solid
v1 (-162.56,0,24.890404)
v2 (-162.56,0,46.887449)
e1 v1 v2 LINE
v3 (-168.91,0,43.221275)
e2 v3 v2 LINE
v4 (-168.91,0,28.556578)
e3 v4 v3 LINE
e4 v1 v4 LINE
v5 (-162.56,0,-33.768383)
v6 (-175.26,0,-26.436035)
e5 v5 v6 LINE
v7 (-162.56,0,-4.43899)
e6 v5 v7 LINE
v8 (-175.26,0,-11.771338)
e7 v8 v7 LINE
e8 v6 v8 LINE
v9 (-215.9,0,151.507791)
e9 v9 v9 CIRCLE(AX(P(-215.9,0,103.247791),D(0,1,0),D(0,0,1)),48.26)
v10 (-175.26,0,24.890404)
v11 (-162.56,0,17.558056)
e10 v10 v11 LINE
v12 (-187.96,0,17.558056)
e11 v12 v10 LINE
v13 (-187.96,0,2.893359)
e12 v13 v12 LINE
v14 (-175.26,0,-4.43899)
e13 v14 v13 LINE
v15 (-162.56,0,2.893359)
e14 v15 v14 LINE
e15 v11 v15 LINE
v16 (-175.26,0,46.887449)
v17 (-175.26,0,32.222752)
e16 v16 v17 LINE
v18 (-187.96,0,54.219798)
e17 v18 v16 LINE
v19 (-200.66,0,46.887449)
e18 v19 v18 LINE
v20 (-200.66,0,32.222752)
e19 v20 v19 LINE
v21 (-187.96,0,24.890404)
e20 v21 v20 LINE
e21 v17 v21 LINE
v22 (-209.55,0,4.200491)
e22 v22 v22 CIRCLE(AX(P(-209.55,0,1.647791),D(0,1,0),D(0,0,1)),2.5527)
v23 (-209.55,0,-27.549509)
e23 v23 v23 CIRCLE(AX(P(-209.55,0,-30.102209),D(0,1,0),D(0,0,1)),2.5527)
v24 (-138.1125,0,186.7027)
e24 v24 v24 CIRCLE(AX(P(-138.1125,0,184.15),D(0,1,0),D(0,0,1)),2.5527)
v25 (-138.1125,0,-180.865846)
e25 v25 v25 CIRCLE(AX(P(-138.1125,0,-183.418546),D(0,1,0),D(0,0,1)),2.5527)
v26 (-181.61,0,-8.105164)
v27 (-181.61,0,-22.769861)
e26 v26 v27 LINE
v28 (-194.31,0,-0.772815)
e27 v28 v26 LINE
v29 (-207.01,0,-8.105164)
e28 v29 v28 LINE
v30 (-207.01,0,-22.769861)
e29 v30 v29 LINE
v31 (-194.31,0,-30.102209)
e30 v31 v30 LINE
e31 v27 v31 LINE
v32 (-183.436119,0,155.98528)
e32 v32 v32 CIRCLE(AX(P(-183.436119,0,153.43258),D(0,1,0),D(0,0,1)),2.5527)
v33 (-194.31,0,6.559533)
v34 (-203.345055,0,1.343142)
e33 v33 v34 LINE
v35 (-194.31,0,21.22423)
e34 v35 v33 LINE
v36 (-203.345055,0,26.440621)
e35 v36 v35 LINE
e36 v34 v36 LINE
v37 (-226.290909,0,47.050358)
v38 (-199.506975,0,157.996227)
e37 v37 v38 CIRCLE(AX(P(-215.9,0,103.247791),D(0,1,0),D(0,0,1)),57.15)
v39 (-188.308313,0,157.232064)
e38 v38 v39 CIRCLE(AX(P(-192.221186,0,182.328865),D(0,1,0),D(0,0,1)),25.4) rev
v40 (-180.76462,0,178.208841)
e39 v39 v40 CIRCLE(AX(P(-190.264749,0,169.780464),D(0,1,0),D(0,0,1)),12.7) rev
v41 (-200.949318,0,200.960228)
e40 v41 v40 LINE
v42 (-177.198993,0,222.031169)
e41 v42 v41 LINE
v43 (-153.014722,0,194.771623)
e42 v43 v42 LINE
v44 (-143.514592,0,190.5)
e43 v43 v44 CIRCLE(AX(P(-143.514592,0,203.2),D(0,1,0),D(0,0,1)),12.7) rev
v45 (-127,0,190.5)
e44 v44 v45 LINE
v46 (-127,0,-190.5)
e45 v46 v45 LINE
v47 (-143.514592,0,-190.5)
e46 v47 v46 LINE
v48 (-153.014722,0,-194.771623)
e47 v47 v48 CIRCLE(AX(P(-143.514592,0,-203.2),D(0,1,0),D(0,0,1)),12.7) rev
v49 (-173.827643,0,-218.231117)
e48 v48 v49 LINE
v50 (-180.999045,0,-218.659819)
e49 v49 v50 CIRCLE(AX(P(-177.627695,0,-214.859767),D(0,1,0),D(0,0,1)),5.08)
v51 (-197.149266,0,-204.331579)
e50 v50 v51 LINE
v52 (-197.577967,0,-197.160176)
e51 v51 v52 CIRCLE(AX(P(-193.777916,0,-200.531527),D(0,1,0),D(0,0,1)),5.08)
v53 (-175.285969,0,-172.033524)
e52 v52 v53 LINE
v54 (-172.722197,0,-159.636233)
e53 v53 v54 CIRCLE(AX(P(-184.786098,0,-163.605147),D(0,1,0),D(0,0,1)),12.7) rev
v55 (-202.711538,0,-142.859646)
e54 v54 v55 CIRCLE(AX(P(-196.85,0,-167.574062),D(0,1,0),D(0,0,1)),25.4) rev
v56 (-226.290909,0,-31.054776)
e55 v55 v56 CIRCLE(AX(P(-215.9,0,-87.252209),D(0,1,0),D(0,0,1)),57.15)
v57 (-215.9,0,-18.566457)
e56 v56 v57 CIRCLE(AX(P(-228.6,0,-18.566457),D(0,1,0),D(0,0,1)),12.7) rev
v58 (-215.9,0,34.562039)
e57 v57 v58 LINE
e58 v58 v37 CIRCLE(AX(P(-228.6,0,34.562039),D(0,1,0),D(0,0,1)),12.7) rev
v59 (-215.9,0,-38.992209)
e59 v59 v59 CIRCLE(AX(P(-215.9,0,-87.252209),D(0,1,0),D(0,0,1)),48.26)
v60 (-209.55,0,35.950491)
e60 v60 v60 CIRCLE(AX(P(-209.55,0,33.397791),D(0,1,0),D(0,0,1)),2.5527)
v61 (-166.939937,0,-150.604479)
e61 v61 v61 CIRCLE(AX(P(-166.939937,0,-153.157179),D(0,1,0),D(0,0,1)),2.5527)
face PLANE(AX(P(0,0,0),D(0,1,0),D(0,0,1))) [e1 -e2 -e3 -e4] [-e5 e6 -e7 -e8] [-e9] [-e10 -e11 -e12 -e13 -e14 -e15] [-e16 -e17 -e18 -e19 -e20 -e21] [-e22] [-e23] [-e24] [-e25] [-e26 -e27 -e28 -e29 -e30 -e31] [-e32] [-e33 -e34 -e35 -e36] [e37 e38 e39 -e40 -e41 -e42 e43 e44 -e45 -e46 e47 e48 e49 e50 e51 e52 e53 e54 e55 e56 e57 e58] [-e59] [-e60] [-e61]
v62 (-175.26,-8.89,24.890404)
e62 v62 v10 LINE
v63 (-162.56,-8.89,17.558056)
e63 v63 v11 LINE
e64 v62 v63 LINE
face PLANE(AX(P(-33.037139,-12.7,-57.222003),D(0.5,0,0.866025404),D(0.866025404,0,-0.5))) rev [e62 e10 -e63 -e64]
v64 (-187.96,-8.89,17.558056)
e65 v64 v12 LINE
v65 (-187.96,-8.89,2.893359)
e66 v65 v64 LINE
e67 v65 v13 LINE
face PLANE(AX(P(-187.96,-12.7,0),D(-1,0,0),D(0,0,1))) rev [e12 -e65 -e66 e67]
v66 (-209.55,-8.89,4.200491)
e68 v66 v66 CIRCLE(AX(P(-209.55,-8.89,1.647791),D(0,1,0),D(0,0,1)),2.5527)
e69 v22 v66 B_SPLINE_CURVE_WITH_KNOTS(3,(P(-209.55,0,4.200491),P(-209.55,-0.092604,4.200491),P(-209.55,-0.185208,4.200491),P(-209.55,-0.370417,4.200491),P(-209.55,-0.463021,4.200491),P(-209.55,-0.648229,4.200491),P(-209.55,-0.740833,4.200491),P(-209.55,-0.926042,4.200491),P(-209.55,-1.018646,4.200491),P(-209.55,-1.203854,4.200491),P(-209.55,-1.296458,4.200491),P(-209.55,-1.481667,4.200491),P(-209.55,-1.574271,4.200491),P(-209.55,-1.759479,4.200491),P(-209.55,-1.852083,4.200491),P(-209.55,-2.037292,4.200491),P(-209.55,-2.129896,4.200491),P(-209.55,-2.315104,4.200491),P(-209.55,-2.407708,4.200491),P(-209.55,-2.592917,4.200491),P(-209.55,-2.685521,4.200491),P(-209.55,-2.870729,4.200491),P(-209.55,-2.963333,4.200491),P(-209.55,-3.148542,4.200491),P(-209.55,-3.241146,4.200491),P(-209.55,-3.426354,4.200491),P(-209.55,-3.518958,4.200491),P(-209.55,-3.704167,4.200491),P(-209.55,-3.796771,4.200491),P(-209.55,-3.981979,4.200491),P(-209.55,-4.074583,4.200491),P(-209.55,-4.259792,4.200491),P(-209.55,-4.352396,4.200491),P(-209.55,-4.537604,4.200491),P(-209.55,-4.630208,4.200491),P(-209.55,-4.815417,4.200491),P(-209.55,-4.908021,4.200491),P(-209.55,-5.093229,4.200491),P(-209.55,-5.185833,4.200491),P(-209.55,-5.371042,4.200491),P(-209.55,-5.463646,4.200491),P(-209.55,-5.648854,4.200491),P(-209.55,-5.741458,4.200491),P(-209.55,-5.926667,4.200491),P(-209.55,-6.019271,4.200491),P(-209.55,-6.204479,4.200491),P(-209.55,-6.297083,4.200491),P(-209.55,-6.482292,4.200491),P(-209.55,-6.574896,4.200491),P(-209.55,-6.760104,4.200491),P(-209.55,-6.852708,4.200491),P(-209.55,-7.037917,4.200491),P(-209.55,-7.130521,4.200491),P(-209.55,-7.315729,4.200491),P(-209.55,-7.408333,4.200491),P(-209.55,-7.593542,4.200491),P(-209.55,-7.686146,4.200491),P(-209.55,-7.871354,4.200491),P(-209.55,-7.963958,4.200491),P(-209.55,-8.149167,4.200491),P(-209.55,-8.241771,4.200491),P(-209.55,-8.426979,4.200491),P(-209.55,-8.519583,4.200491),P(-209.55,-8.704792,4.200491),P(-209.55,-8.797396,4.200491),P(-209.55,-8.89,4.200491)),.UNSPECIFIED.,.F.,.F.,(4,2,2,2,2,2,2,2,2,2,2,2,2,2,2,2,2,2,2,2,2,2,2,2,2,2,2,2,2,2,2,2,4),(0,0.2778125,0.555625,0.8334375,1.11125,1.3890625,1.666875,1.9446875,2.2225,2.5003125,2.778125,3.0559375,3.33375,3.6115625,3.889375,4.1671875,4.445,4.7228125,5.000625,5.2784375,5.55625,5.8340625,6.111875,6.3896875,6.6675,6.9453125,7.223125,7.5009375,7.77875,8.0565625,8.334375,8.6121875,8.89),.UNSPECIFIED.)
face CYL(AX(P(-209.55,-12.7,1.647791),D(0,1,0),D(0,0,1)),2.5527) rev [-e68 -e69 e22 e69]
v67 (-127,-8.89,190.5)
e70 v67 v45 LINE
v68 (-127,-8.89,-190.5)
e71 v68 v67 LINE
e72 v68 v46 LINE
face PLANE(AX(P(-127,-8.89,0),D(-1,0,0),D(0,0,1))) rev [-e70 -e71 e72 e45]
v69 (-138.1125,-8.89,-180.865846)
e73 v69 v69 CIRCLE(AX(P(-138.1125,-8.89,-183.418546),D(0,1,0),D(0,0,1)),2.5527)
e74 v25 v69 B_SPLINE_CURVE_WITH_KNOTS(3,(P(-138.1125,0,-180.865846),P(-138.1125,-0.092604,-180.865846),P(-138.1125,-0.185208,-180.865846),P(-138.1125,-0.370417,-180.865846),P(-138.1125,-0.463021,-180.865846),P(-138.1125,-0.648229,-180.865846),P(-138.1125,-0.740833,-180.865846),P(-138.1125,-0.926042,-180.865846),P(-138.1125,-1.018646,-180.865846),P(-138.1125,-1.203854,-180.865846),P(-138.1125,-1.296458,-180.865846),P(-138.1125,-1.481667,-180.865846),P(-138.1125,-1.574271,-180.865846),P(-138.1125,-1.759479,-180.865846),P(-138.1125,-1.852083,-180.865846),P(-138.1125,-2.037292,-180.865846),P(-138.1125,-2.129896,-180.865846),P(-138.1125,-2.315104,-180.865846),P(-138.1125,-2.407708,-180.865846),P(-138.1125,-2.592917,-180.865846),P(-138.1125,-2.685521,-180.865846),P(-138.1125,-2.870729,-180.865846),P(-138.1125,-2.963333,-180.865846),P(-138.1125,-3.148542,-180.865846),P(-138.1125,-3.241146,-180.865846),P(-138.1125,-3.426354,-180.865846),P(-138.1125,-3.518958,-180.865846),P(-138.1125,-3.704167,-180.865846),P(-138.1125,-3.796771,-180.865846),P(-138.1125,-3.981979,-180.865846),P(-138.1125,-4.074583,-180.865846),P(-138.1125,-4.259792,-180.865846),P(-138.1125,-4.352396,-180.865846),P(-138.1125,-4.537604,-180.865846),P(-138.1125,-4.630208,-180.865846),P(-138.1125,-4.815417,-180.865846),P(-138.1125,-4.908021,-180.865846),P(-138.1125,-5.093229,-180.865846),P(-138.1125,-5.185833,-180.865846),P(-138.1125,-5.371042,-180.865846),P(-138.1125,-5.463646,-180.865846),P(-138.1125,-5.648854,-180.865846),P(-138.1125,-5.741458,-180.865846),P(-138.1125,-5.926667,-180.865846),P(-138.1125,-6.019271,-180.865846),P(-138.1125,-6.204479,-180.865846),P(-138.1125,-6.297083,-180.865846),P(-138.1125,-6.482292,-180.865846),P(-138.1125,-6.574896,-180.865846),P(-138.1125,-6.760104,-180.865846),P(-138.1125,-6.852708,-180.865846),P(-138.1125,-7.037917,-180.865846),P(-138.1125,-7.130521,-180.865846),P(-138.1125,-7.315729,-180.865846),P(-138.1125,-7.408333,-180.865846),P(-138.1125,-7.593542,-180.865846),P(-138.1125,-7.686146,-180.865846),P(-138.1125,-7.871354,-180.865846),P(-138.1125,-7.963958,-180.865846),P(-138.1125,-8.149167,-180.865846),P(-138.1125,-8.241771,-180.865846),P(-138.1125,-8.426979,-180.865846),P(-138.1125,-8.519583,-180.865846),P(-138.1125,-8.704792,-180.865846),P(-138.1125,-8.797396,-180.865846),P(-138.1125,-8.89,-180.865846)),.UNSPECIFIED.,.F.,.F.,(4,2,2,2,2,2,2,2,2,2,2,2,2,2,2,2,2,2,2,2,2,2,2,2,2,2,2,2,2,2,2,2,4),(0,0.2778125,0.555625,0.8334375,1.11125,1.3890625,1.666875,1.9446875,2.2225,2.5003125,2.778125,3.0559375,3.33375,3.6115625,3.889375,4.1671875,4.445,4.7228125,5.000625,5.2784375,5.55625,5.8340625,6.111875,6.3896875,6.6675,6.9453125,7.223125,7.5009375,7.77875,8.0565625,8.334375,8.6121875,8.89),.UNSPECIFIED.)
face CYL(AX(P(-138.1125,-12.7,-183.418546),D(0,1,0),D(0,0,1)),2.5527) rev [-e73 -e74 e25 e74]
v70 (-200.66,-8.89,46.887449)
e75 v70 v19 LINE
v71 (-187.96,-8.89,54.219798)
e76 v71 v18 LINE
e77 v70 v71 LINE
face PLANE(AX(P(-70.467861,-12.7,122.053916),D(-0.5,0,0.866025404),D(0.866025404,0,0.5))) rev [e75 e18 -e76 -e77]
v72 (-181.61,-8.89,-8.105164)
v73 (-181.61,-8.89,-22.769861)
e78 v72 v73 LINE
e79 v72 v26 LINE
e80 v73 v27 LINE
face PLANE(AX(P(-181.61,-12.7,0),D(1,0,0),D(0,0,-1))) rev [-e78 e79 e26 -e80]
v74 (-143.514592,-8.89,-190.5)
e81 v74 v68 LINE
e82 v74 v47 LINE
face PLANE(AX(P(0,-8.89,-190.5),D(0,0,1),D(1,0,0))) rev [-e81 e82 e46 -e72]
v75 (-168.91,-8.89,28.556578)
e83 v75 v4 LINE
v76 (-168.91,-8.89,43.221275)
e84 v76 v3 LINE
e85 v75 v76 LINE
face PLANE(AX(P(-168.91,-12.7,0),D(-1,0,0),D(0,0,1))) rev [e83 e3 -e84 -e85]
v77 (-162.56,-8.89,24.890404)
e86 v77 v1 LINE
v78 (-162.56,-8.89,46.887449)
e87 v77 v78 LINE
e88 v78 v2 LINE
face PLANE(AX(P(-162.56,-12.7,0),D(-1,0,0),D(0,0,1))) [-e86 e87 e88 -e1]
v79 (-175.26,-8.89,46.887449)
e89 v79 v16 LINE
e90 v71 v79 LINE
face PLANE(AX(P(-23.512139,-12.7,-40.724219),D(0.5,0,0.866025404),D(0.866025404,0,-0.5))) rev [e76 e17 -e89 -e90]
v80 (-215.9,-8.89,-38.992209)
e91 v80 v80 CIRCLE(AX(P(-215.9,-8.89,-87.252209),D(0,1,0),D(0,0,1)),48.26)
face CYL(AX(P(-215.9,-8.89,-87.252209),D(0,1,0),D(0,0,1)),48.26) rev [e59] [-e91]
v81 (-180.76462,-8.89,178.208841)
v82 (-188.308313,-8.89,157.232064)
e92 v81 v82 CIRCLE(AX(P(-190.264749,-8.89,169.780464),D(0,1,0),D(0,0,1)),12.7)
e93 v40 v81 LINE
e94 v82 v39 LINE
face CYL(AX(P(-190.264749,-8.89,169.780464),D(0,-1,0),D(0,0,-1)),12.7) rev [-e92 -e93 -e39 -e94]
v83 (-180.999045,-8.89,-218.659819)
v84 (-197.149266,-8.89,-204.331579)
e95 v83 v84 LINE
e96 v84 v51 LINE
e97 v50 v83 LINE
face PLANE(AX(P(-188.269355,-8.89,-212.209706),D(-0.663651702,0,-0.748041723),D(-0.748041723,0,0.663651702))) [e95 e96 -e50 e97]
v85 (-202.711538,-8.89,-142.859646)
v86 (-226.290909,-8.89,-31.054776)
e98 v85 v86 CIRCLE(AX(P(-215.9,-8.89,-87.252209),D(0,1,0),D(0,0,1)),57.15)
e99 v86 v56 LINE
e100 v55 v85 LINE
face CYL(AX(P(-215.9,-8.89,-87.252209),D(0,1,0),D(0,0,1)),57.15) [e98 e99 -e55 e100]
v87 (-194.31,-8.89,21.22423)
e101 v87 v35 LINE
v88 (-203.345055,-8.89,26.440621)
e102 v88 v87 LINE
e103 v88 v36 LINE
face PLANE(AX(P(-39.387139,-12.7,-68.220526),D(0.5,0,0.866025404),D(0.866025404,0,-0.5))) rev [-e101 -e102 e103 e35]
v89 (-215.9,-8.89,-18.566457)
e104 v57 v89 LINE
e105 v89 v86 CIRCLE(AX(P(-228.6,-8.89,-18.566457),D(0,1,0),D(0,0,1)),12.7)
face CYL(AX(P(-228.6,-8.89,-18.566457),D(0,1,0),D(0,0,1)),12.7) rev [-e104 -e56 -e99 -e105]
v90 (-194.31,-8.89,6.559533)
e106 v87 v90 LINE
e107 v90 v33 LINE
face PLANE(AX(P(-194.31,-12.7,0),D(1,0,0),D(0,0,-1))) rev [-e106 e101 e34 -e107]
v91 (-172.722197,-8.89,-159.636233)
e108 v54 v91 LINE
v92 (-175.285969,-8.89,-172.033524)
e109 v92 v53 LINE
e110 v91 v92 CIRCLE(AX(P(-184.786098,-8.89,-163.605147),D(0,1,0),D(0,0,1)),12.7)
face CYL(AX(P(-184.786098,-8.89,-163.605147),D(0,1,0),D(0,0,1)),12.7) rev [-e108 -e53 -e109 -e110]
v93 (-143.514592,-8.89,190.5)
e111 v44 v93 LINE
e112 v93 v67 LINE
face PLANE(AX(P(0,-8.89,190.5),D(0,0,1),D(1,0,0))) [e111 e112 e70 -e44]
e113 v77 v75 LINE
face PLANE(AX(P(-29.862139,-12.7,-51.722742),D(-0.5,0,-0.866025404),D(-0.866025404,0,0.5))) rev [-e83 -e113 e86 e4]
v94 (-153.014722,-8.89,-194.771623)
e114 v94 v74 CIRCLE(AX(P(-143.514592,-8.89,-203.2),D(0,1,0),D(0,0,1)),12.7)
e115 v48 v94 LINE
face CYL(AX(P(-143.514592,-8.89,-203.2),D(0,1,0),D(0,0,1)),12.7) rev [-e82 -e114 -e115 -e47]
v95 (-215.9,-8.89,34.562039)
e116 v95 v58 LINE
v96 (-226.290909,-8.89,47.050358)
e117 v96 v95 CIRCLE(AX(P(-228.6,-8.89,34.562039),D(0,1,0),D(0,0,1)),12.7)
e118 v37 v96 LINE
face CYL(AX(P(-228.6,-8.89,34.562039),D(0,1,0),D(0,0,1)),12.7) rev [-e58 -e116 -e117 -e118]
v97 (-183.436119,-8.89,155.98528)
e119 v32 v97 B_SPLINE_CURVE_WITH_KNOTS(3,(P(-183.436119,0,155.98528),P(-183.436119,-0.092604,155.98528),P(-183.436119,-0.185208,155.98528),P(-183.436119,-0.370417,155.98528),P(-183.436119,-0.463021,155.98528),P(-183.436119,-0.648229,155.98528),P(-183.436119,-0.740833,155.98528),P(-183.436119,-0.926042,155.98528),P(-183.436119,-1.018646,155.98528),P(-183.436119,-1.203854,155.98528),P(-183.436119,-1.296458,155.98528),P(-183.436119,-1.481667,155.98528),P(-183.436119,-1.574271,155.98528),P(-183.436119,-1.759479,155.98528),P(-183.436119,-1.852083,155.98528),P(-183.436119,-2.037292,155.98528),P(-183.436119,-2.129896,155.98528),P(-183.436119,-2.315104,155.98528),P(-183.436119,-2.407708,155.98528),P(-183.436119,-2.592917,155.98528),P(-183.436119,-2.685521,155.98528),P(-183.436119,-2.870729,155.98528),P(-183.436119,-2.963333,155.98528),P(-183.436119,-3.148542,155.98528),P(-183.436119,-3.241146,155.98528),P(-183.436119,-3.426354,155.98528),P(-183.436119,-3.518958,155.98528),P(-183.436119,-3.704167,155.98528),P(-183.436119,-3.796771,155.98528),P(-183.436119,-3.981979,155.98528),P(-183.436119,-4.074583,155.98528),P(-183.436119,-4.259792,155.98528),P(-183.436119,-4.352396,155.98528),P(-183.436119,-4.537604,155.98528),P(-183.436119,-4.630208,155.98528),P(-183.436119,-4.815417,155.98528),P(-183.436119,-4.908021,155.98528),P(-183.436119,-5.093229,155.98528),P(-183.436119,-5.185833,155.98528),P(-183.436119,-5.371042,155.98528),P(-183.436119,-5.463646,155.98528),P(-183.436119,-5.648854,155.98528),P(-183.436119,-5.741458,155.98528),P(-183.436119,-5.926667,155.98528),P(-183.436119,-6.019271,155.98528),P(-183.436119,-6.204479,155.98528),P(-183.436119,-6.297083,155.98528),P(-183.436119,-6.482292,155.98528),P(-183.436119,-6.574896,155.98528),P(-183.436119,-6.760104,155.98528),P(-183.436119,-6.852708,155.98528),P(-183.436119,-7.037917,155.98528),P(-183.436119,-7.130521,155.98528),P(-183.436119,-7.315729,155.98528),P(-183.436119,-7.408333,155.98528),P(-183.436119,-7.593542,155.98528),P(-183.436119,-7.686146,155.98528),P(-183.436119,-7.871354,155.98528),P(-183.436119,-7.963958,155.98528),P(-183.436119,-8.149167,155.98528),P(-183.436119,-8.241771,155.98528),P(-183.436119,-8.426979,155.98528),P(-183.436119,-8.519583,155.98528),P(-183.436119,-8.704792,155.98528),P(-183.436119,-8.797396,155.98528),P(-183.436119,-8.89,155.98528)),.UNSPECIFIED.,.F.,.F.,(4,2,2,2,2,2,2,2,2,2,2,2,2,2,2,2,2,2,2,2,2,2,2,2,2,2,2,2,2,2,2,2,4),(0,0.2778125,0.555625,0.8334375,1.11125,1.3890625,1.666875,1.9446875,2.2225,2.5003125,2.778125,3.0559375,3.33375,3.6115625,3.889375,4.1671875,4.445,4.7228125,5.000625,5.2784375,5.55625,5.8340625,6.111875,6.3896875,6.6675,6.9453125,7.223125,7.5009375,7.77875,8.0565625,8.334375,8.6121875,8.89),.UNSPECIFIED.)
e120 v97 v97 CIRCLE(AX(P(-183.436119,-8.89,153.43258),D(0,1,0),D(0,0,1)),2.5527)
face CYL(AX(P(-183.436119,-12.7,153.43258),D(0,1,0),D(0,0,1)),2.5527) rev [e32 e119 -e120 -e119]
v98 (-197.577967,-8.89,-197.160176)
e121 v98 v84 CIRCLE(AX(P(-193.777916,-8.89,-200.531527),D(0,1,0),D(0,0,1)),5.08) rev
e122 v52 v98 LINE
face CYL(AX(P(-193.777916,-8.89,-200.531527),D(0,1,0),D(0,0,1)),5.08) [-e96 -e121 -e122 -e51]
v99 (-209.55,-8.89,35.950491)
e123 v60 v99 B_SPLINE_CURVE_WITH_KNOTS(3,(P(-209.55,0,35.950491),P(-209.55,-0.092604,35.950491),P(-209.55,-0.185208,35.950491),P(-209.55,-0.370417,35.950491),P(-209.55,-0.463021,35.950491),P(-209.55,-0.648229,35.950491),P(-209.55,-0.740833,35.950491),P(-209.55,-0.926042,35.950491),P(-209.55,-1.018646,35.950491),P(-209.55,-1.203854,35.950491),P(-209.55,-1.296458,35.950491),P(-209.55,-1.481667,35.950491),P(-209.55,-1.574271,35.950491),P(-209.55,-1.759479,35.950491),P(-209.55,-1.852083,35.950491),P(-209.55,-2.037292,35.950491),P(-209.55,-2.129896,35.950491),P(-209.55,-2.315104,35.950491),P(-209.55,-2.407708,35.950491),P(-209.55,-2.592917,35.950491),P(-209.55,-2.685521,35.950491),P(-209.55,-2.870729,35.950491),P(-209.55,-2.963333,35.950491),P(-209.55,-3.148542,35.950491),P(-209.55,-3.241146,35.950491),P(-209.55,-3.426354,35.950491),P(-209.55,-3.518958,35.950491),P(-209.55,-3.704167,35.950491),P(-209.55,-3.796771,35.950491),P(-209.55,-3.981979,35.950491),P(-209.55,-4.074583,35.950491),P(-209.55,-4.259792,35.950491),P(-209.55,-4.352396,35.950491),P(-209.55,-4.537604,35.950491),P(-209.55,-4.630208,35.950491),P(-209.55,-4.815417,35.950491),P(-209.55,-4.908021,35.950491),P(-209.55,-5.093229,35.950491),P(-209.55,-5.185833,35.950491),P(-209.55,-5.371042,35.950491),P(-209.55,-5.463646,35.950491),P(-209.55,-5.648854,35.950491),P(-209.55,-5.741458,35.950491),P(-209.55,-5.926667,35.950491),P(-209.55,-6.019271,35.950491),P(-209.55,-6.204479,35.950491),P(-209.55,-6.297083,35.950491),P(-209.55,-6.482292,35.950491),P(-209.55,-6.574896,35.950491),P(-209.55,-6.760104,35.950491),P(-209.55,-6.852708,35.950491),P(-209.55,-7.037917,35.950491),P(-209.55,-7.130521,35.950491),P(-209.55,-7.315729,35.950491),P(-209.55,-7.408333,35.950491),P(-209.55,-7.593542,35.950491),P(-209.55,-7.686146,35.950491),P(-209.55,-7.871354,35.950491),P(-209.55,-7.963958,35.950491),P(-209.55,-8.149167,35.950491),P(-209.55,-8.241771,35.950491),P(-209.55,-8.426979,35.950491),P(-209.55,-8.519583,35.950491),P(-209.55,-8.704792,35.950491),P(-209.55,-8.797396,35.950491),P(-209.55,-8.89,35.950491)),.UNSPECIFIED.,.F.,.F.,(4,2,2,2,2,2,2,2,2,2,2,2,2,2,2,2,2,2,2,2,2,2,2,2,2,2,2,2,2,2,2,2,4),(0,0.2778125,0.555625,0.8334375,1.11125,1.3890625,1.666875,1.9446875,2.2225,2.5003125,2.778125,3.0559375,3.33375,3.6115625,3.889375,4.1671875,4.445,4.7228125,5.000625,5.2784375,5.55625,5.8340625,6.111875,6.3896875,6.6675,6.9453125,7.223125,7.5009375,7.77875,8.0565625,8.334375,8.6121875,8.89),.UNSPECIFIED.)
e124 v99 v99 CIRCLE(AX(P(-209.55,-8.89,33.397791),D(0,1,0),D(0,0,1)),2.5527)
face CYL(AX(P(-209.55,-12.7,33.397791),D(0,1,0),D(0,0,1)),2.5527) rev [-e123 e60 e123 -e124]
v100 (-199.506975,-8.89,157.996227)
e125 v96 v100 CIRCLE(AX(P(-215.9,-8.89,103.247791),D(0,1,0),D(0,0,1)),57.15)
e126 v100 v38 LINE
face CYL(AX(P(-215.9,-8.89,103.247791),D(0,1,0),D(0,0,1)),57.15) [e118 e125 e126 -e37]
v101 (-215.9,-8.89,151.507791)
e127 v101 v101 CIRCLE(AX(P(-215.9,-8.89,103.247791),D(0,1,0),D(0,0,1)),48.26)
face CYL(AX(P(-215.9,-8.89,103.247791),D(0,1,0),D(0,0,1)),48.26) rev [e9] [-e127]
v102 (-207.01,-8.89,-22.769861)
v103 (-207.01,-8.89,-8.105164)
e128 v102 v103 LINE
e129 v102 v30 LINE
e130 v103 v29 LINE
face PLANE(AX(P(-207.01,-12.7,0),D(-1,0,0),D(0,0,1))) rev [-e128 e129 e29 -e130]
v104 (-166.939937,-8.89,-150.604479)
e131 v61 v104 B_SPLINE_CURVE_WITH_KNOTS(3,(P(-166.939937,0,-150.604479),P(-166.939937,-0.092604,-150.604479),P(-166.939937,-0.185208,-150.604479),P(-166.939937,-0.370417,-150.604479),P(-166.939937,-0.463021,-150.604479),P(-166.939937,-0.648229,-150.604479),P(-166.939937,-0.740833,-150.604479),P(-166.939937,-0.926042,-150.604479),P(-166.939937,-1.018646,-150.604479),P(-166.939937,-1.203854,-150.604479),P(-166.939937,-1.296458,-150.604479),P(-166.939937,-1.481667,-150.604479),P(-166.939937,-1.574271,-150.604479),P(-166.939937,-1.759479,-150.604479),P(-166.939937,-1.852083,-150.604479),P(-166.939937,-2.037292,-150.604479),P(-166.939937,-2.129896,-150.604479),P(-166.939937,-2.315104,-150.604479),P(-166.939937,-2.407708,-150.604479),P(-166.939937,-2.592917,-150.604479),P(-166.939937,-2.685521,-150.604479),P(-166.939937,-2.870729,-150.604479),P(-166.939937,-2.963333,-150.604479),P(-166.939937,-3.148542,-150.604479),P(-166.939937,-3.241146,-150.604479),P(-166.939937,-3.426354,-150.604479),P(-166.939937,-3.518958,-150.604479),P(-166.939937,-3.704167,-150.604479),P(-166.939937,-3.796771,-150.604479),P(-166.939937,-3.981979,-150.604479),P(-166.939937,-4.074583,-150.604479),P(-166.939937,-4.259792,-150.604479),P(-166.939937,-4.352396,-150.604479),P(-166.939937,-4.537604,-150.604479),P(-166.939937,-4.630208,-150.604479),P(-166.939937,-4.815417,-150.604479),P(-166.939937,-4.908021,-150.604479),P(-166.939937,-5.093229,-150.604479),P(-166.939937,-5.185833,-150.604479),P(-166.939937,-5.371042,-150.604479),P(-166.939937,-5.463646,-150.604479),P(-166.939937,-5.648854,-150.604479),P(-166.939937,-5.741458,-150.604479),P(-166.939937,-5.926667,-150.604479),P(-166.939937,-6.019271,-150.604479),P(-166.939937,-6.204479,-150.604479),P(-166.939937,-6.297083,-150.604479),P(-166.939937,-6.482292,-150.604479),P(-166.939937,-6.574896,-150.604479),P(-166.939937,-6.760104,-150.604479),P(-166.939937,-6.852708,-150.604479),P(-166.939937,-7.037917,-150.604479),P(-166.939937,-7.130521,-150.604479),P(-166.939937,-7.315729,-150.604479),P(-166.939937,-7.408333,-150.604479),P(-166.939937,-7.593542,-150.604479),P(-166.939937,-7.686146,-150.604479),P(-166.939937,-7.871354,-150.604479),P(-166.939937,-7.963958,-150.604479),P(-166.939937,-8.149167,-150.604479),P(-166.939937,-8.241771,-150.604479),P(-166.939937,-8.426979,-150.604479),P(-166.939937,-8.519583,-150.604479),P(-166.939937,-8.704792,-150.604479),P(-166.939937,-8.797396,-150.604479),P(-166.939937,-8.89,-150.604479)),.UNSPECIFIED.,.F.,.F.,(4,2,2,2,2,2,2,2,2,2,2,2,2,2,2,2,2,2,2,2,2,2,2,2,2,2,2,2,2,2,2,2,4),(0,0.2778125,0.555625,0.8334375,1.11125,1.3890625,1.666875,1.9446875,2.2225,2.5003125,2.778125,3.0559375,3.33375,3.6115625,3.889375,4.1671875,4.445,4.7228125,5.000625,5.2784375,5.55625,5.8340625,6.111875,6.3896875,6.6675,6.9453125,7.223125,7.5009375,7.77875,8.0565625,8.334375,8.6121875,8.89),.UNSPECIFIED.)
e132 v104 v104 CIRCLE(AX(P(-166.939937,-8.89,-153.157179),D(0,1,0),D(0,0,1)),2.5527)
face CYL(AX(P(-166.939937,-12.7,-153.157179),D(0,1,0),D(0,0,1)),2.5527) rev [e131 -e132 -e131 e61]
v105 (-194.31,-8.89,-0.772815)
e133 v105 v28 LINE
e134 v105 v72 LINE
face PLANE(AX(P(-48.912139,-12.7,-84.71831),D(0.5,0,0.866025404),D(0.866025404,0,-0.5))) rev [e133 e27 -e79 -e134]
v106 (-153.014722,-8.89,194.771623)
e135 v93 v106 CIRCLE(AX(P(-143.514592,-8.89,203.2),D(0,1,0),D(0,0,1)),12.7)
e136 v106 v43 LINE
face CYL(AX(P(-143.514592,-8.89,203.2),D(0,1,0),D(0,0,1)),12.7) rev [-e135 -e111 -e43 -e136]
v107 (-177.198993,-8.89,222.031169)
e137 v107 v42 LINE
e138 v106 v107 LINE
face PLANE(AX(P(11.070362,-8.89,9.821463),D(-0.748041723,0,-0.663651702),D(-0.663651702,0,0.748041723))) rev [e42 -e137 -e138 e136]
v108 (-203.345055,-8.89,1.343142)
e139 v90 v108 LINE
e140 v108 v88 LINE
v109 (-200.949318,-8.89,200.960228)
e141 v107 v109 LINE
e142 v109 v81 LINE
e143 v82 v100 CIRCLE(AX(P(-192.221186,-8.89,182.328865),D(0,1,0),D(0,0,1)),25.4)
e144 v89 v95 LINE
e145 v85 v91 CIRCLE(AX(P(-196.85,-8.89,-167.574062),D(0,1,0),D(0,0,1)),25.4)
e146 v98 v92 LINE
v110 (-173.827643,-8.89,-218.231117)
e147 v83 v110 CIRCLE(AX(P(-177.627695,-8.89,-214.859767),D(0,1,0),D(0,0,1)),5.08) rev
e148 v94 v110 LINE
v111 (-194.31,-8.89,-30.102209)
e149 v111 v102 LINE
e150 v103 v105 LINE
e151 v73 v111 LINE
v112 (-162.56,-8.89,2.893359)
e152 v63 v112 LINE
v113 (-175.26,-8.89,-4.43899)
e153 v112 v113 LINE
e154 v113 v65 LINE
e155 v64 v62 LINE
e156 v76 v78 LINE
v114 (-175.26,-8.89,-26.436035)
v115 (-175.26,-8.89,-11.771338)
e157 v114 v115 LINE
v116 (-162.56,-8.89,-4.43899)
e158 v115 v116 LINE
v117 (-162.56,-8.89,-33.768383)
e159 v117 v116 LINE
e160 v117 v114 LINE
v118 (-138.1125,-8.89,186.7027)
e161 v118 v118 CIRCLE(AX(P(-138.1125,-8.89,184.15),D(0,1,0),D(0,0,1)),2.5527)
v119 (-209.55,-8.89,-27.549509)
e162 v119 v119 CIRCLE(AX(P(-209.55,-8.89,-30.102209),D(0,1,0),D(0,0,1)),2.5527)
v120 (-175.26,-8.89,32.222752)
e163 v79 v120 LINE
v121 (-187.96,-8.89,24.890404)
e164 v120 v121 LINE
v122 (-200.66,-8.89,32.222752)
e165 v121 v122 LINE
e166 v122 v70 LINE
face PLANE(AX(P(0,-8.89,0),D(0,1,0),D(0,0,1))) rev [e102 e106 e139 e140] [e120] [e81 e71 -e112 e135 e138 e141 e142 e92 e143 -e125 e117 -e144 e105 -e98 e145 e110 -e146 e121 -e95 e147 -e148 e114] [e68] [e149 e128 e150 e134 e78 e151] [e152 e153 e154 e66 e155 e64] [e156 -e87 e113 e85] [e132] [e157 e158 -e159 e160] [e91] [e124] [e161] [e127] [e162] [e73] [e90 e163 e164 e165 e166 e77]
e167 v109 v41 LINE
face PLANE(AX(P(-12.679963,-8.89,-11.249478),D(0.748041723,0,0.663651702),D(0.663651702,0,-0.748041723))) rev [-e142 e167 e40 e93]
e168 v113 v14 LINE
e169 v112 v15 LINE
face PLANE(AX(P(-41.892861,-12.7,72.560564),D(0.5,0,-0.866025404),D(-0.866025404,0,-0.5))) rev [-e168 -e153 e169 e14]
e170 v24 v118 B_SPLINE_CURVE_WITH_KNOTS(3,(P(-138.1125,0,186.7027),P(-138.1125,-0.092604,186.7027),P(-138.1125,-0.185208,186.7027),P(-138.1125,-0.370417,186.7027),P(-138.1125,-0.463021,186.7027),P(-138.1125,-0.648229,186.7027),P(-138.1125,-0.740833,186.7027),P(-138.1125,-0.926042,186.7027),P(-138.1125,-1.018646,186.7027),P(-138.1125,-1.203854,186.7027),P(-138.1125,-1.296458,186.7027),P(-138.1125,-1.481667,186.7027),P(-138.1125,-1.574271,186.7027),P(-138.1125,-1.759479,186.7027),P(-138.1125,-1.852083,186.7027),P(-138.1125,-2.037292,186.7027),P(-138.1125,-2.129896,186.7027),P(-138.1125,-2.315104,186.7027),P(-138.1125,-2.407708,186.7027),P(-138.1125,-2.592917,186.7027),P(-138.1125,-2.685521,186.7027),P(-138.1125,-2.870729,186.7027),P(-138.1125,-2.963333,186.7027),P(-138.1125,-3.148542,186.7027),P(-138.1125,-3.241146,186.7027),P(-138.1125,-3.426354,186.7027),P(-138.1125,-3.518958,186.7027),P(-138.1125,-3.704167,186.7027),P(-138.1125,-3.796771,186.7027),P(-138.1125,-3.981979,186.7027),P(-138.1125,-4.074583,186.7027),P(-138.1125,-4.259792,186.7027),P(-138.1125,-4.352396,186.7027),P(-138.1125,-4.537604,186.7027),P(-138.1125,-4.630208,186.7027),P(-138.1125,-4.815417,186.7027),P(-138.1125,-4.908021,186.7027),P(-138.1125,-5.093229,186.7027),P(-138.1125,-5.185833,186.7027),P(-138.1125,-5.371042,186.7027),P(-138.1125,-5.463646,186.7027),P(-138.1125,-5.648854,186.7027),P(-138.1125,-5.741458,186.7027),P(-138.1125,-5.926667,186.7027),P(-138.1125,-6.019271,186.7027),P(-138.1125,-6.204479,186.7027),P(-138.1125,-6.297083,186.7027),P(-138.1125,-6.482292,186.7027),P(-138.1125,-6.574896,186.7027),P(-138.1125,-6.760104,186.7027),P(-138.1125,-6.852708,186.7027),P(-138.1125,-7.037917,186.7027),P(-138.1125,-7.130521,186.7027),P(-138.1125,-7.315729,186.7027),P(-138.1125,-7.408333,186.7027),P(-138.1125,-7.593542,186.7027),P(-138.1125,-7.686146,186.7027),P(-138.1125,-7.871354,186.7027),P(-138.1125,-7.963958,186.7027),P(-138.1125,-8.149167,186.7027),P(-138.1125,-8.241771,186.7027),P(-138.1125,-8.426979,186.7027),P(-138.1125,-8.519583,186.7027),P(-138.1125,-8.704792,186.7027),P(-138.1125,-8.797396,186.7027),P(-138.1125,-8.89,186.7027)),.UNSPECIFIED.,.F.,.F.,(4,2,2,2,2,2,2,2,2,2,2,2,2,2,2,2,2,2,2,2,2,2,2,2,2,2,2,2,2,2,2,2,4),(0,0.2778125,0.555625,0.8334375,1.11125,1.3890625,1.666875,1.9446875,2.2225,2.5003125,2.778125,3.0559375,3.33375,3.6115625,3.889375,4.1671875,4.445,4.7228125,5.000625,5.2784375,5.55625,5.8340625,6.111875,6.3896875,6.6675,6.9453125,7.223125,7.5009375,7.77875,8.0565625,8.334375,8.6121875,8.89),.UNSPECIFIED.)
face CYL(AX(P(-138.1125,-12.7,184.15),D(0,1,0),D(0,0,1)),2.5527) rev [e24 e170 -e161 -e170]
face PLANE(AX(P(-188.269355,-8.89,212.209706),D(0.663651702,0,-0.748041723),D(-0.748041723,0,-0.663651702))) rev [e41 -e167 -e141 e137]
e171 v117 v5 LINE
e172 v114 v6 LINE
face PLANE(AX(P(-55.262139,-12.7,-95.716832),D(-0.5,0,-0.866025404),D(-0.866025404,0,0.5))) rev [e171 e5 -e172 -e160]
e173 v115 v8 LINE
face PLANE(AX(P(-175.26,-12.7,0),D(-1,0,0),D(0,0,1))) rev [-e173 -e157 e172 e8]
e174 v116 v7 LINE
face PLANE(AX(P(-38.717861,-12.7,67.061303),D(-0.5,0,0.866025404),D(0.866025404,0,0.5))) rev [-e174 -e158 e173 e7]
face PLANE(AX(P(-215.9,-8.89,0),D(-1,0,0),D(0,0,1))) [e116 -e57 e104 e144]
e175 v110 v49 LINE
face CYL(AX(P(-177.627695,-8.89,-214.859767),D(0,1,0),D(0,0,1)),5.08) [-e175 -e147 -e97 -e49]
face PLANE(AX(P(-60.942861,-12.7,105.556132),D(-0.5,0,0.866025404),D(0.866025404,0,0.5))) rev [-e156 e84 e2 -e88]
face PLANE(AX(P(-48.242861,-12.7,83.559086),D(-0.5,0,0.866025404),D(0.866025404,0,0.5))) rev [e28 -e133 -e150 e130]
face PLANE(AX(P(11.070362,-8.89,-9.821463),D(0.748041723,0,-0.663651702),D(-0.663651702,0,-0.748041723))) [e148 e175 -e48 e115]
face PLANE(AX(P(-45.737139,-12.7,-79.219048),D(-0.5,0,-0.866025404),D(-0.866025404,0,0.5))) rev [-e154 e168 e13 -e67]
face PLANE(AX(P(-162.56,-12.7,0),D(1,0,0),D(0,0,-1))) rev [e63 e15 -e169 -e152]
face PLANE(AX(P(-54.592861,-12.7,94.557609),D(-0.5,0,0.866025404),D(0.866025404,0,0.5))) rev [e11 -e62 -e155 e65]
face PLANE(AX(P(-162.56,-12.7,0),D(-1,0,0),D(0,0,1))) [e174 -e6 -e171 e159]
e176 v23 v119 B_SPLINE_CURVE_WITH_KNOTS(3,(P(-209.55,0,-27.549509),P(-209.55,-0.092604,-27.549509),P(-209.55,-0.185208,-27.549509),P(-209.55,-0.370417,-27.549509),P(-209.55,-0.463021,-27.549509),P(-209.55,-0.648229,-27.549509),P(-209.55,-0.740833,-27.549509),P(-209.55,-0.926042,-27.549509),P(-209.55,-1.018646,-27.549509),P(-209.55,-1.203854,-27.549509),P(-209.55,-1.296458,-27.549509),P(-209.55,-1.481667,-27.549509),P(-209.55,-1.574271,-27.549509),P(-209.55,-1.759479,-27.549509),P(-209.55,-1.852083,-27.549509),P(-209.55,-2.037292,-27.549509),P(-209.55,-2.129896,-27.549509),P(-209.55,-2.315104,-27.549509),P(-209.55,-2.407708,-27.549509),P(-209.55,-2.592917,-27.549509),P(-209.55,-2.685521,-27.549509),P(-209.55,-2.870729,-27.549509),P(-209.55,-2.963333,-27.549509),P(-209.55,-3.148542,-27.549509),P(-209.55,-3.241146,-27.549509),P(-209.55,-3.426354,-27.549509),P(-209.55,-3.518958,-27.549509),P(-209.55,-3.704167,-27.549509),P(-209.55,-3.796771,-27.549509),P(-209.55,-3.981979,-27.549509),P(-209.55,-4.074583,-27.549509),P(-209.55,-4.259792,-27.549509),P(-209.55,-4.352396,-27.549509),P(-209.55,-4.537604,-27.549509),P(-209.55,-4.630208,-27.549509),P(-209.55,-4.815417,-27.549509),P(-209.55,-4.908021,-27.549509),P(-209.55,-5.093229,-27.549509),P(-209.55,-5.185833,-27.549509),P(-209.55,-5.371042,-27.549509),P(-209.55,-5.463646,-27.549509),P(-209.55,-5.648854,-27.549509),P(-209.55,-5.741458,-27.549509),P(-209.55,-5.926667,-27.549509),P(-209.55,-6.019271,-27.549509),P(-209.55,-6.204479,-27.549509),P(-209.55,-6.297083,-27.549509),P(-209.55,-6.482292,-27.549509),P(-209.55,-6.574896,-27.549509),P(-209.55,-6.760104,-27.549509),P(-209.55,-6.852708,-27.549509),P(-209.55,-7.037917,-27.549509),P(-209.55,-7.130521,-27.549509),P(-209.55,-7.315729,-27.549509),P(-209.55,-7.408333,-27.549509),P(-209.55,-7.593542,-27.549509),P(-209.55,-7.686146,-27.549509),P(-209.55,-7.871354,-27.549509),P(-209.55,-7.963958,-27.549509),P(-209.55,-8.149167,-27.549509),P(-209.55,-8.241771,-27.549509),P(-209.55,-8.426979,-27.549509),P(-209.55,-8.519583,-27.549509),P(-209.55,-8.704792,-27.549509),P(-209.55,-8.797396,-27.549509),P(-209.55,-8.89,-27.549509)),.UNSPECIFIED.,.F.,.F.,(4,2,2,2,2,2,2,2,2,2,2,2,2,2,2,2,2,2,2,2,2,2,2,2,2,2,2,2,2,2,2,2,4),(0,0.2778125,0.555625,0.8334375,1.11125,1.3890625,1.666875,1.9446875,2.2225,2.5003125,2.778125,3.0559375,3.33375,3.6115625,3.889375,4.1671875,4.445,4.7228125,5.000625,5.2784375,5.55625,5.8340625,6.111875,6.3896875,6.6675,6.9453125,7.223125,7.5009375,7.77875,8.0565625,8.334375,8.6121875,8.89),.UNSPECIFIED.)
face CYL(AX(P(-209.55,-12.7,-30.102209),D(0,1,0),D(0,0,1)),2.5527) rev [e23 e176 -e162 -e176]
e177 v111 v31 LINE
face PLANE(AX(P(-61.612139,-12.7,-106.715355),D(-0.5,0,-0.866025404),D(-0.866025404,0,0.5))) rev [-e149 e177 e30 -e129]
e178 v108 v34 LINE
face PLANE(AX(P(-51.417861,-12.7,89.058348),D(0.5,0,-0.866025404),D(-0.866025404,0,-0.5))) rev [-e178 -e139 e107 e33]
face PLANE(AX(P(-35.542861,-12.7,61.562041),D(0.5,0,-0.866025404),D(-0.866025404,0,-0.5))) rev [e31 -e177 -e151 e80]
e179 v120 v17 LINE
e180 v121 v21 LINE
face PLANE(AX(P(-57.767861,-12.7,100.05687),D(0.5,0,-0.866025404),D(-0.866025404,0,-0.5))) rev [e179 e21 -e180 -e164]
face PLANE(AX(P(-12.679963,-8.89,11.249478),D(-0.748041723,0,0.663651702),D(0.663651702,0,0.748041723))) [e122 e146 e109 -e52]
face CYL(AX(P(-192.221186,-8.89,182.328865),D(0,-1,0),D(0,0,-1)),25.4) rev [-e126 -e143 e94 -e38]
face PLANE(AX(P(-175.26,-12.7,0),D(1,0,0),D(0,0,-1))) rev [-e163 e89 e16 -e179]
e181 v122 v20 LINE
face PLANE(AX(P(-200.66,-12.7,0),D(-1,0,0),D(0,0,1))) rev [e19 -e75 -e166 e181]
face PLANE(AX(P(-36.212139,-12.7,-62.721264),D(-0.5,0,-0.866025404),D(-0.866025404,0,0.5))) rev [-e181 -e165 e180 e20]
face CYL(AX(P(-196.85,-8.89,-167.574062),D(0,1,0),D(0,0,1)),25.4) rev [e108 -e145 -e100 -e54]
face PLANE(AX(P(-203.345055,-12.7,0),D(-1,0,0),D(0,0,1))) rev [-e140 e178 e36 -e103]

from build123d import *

# Parameters (mm, degrees)
SKETCH5_R           = 48.26
BOSS_EXTRUDE1_DEPTH = 8.89
FILLET1_R           = 25.4
SKETCH9_R           = 2.5527
CUT_EXTRUDE1_DEPTH  = 12.7
FILLET3_R           = 12.7
FILLET4_R           = 12.7
FILLET5_R           = 5.08


with BuildPart() as part:
    # Sketch5 → Boss-Extrude1 (new body)
    with BuildSketch(Plane(origin=(0, 0, 0), x_dir=(1, 0, 0), z_dir=(0, 1, 0))):
        with BuildLine():
            ThreePointArc((-215.9, -46.097790831), (-267.470384182, -127.877406649), (-171.45, -139.168815315))
            Line((-171.45, -139.168815315), (-171.45, -167.709773326))
            Line((-171.45, -167.709773326), (-200.949318136, -200.960227902))
            Line((-200.949318136, -200.960227902), (-177.198993439, -222.031169428))
            Line((-177.198993439, -222.031169428), (-149.225, -190.5))
            Line((-149.225, -190.5), (-127, -190.5))
            Line((-127, -190.5), (-127, 190.5))
            Line((-127, 190.5), (-149.225, 190.5))
            Line((-149.225, 190.5), (-177.198993439, 222.031169428))
            Line((-177.198993439, 222.031169428), (-200.949318136, 200.960227902))
            Line((-200.949318136, 200.960227902), (-171.45, 167.709773326))
            Line((-171.45, 167.709773326), (-171.45, 123.173233653))
            ThreePointArc((-171.45, 123.173233653), (-267.470384182, 111.881824988), (-215.9, 30.102209169))
            Line((-215.9, 30.102209169), (-215.9, -46.097790831))
        make_face()
        with Locations(Location((-215.9, -103.247790831, 0), (0, 0, 270))):
            Circle(SKETCH5_R, mode=Mode.SUBTRACT)
        with Locations(Location((-215.9, 87.252209169, 0), (0, 0, 270))):
            Circle(SKETCH5_R, mode=Mode.SUBTRACT)
    extrude(amount=-BOSS_EXTRUDE1_DEPTH)

    # Fillet1
    # the kernel refuses this fillet: 25.4 mm, written as the material it adds along each edge
    with BuildSketch(Plane(origin=(-171.45, 0, -123.173233653), x_dir=(0, 0, -1), z_dir=(0, -1, 0))) as fillet1_piece_1:
        with BuildLine():
            CenterArc((44.400828084, -25.4), FILLET1_R, 90, 103.342363797)
            Line((19.686411909, -31.261538462), (19.192123586, -31.378769231))
            ThreePointArc((19.192123586, -31.378769231), (12.009069237, -14.266854375), (-0.319297995, -0.395111111))
            Line((-0.319297995, -0.395111111), (0, 0.508))
            Line((0, 0.508), (44.400828084, 0.508))
            Line((44.400828084, 0.508), (44.400828084, 0))
        make_face()
    extrude(amount=8.89)
    with BuildSketch(Plane(origin=(-171.45, 0, 139.168815315), x_dir=(-0.8303696180979097, 0, 0.557212973054228), z_dir=(0, -1, 0))) as fillet1_piece_2:
        with BuildLine():
            CenterArc((41.297101209, -24.264819571), FILLET1_R, 107.194284187, 71.530497093)
            Line((15.903392067, -23.699544404), (15.395517884, -23.6882389))
            ThreePointArc((15.395517884, -23.6882389), (7.529868268, -12.132836392), (-0.421827766, -0.28306419))
            Line((-0.421827766, -0.28306419), (0.150171277, 0.485296391))
            ThreePointArc((0.150171277, 0.485296391), (16.894268676, -2.046155965), (33.638366076, 0.485296391))
            Line((33.638366076, 0.485296391), (33.788537353, 0))
        make_face()
    extrude(amount=8.89)

    # Sketch9 → Cut-Extrude1 (cut)
    with BuildSketch(Plane(origin=(0, 0, 0), x_dir=(1, 0, 0), z_dir=(0, 1, 0))):
        Polygon((-181.61, 8.105163913), (-181.61, 22.76986075), (-194.31, 30.102209169), (-207.01, 22.76986075), (-207.01, 8.105163913), (-194.31, 0.772815494), align=None)
        Polygon((-175.26, -46.887449227), (-175.26, -32.22275239), (-187.96, -24.890403971), (-200.66, -32.22275239), (-200.66, -46.887449227), (-187.96, -54.219797646), align=None)
        Polygon((-175.26, -24.890403971), (-162.56, -17.558055552), (-162.56, -2.893358715), (-175.26, 4.438989704), (-187.96, -2.893358715), (-187.96, -17.558055552), align=None)
        Polygon((-194.31, -6.559532924), (-203.345054514, -1.343141768), (-203.345054514, -26.440620918), (-194.31, -21.224229762), align=None)
        Polygon((-162.56, 33.768383379), (-162.56, 4.438989704), (-175.26, 11.771338122), (-175.26, 26.43603496), align=None)
        Polygon((-162.56, -24.890403971), (-162.56, -46.887449227), (-168.91, -43.221275018), (-168.91, -28.55657818), align=None)
        with Locations(Location((-183.436118723, -153.432579675, 0), (0, 0, 270))):
            Circle(SKETCH9_R)
        with Locations(Location((-138.1125, 183.418546383, 0), (0, 0, 270))):
            Circle(SKETCH9_R)
        with Locations(Location((-138.1125, -184.15, 0), (0, 0, 270))):
            Circle(SKETCH9_R)
        with Locations(Location((-166.939936911, 153.157179019, 0), (0, 0, 270))):
            Circle(SKETCH9_R)
        with Locations(Location((-209.55, -1.647790831, 0), (0, 0, 270))):
            Circle(SKETCH9_R)
        with Locations(Location((-209.55, -33.397790831, 0), (0, 0, 270))):
            Circle(SKETCH9_R)
        with Locations(Location((-209.55, 30.102209169, 0), (0, 0, 270))):
            Circle(SKETCH9_R)
    extrude(amount=-CUT_EXTRUDE1_DEPTH, mode=Mode.SUBTRACT)

    # Fillet3
    fillet3_edges = [part.edges().sort_by_distance(p)[0] for p in [
        (-149.225, -4.445, -190.5),
        (-171.45, -4.445, -167.709773326),
        (-171.45, -4.445, 167.709773326),
        (-149.225, -4.445, 190.5),
    ]]
    fillet(fillet3_edges, radius=FILLET3_R)

    # Fillet4
    fillet4_edges = [part.edges().sort_by_distance(p)[0] for p in [
        (-215.9, -4.445, 46.097790831),
        (-215.9, -4.445, -30.102209169),
    ]]
    fillet(fillet4_edges, radius=FILLET4_R)

    # Fillet5
    fillet5_edges = [part.edges().sort_by_distance(p)[0] for p in [
        (-200.949318136, -4.445, -200.960227902),
        (-177.198993439, -4.445, -222.031169428),
    ]]
    fillet(fillet5_edges, radius=FILLET5_R)


solid = part.part
